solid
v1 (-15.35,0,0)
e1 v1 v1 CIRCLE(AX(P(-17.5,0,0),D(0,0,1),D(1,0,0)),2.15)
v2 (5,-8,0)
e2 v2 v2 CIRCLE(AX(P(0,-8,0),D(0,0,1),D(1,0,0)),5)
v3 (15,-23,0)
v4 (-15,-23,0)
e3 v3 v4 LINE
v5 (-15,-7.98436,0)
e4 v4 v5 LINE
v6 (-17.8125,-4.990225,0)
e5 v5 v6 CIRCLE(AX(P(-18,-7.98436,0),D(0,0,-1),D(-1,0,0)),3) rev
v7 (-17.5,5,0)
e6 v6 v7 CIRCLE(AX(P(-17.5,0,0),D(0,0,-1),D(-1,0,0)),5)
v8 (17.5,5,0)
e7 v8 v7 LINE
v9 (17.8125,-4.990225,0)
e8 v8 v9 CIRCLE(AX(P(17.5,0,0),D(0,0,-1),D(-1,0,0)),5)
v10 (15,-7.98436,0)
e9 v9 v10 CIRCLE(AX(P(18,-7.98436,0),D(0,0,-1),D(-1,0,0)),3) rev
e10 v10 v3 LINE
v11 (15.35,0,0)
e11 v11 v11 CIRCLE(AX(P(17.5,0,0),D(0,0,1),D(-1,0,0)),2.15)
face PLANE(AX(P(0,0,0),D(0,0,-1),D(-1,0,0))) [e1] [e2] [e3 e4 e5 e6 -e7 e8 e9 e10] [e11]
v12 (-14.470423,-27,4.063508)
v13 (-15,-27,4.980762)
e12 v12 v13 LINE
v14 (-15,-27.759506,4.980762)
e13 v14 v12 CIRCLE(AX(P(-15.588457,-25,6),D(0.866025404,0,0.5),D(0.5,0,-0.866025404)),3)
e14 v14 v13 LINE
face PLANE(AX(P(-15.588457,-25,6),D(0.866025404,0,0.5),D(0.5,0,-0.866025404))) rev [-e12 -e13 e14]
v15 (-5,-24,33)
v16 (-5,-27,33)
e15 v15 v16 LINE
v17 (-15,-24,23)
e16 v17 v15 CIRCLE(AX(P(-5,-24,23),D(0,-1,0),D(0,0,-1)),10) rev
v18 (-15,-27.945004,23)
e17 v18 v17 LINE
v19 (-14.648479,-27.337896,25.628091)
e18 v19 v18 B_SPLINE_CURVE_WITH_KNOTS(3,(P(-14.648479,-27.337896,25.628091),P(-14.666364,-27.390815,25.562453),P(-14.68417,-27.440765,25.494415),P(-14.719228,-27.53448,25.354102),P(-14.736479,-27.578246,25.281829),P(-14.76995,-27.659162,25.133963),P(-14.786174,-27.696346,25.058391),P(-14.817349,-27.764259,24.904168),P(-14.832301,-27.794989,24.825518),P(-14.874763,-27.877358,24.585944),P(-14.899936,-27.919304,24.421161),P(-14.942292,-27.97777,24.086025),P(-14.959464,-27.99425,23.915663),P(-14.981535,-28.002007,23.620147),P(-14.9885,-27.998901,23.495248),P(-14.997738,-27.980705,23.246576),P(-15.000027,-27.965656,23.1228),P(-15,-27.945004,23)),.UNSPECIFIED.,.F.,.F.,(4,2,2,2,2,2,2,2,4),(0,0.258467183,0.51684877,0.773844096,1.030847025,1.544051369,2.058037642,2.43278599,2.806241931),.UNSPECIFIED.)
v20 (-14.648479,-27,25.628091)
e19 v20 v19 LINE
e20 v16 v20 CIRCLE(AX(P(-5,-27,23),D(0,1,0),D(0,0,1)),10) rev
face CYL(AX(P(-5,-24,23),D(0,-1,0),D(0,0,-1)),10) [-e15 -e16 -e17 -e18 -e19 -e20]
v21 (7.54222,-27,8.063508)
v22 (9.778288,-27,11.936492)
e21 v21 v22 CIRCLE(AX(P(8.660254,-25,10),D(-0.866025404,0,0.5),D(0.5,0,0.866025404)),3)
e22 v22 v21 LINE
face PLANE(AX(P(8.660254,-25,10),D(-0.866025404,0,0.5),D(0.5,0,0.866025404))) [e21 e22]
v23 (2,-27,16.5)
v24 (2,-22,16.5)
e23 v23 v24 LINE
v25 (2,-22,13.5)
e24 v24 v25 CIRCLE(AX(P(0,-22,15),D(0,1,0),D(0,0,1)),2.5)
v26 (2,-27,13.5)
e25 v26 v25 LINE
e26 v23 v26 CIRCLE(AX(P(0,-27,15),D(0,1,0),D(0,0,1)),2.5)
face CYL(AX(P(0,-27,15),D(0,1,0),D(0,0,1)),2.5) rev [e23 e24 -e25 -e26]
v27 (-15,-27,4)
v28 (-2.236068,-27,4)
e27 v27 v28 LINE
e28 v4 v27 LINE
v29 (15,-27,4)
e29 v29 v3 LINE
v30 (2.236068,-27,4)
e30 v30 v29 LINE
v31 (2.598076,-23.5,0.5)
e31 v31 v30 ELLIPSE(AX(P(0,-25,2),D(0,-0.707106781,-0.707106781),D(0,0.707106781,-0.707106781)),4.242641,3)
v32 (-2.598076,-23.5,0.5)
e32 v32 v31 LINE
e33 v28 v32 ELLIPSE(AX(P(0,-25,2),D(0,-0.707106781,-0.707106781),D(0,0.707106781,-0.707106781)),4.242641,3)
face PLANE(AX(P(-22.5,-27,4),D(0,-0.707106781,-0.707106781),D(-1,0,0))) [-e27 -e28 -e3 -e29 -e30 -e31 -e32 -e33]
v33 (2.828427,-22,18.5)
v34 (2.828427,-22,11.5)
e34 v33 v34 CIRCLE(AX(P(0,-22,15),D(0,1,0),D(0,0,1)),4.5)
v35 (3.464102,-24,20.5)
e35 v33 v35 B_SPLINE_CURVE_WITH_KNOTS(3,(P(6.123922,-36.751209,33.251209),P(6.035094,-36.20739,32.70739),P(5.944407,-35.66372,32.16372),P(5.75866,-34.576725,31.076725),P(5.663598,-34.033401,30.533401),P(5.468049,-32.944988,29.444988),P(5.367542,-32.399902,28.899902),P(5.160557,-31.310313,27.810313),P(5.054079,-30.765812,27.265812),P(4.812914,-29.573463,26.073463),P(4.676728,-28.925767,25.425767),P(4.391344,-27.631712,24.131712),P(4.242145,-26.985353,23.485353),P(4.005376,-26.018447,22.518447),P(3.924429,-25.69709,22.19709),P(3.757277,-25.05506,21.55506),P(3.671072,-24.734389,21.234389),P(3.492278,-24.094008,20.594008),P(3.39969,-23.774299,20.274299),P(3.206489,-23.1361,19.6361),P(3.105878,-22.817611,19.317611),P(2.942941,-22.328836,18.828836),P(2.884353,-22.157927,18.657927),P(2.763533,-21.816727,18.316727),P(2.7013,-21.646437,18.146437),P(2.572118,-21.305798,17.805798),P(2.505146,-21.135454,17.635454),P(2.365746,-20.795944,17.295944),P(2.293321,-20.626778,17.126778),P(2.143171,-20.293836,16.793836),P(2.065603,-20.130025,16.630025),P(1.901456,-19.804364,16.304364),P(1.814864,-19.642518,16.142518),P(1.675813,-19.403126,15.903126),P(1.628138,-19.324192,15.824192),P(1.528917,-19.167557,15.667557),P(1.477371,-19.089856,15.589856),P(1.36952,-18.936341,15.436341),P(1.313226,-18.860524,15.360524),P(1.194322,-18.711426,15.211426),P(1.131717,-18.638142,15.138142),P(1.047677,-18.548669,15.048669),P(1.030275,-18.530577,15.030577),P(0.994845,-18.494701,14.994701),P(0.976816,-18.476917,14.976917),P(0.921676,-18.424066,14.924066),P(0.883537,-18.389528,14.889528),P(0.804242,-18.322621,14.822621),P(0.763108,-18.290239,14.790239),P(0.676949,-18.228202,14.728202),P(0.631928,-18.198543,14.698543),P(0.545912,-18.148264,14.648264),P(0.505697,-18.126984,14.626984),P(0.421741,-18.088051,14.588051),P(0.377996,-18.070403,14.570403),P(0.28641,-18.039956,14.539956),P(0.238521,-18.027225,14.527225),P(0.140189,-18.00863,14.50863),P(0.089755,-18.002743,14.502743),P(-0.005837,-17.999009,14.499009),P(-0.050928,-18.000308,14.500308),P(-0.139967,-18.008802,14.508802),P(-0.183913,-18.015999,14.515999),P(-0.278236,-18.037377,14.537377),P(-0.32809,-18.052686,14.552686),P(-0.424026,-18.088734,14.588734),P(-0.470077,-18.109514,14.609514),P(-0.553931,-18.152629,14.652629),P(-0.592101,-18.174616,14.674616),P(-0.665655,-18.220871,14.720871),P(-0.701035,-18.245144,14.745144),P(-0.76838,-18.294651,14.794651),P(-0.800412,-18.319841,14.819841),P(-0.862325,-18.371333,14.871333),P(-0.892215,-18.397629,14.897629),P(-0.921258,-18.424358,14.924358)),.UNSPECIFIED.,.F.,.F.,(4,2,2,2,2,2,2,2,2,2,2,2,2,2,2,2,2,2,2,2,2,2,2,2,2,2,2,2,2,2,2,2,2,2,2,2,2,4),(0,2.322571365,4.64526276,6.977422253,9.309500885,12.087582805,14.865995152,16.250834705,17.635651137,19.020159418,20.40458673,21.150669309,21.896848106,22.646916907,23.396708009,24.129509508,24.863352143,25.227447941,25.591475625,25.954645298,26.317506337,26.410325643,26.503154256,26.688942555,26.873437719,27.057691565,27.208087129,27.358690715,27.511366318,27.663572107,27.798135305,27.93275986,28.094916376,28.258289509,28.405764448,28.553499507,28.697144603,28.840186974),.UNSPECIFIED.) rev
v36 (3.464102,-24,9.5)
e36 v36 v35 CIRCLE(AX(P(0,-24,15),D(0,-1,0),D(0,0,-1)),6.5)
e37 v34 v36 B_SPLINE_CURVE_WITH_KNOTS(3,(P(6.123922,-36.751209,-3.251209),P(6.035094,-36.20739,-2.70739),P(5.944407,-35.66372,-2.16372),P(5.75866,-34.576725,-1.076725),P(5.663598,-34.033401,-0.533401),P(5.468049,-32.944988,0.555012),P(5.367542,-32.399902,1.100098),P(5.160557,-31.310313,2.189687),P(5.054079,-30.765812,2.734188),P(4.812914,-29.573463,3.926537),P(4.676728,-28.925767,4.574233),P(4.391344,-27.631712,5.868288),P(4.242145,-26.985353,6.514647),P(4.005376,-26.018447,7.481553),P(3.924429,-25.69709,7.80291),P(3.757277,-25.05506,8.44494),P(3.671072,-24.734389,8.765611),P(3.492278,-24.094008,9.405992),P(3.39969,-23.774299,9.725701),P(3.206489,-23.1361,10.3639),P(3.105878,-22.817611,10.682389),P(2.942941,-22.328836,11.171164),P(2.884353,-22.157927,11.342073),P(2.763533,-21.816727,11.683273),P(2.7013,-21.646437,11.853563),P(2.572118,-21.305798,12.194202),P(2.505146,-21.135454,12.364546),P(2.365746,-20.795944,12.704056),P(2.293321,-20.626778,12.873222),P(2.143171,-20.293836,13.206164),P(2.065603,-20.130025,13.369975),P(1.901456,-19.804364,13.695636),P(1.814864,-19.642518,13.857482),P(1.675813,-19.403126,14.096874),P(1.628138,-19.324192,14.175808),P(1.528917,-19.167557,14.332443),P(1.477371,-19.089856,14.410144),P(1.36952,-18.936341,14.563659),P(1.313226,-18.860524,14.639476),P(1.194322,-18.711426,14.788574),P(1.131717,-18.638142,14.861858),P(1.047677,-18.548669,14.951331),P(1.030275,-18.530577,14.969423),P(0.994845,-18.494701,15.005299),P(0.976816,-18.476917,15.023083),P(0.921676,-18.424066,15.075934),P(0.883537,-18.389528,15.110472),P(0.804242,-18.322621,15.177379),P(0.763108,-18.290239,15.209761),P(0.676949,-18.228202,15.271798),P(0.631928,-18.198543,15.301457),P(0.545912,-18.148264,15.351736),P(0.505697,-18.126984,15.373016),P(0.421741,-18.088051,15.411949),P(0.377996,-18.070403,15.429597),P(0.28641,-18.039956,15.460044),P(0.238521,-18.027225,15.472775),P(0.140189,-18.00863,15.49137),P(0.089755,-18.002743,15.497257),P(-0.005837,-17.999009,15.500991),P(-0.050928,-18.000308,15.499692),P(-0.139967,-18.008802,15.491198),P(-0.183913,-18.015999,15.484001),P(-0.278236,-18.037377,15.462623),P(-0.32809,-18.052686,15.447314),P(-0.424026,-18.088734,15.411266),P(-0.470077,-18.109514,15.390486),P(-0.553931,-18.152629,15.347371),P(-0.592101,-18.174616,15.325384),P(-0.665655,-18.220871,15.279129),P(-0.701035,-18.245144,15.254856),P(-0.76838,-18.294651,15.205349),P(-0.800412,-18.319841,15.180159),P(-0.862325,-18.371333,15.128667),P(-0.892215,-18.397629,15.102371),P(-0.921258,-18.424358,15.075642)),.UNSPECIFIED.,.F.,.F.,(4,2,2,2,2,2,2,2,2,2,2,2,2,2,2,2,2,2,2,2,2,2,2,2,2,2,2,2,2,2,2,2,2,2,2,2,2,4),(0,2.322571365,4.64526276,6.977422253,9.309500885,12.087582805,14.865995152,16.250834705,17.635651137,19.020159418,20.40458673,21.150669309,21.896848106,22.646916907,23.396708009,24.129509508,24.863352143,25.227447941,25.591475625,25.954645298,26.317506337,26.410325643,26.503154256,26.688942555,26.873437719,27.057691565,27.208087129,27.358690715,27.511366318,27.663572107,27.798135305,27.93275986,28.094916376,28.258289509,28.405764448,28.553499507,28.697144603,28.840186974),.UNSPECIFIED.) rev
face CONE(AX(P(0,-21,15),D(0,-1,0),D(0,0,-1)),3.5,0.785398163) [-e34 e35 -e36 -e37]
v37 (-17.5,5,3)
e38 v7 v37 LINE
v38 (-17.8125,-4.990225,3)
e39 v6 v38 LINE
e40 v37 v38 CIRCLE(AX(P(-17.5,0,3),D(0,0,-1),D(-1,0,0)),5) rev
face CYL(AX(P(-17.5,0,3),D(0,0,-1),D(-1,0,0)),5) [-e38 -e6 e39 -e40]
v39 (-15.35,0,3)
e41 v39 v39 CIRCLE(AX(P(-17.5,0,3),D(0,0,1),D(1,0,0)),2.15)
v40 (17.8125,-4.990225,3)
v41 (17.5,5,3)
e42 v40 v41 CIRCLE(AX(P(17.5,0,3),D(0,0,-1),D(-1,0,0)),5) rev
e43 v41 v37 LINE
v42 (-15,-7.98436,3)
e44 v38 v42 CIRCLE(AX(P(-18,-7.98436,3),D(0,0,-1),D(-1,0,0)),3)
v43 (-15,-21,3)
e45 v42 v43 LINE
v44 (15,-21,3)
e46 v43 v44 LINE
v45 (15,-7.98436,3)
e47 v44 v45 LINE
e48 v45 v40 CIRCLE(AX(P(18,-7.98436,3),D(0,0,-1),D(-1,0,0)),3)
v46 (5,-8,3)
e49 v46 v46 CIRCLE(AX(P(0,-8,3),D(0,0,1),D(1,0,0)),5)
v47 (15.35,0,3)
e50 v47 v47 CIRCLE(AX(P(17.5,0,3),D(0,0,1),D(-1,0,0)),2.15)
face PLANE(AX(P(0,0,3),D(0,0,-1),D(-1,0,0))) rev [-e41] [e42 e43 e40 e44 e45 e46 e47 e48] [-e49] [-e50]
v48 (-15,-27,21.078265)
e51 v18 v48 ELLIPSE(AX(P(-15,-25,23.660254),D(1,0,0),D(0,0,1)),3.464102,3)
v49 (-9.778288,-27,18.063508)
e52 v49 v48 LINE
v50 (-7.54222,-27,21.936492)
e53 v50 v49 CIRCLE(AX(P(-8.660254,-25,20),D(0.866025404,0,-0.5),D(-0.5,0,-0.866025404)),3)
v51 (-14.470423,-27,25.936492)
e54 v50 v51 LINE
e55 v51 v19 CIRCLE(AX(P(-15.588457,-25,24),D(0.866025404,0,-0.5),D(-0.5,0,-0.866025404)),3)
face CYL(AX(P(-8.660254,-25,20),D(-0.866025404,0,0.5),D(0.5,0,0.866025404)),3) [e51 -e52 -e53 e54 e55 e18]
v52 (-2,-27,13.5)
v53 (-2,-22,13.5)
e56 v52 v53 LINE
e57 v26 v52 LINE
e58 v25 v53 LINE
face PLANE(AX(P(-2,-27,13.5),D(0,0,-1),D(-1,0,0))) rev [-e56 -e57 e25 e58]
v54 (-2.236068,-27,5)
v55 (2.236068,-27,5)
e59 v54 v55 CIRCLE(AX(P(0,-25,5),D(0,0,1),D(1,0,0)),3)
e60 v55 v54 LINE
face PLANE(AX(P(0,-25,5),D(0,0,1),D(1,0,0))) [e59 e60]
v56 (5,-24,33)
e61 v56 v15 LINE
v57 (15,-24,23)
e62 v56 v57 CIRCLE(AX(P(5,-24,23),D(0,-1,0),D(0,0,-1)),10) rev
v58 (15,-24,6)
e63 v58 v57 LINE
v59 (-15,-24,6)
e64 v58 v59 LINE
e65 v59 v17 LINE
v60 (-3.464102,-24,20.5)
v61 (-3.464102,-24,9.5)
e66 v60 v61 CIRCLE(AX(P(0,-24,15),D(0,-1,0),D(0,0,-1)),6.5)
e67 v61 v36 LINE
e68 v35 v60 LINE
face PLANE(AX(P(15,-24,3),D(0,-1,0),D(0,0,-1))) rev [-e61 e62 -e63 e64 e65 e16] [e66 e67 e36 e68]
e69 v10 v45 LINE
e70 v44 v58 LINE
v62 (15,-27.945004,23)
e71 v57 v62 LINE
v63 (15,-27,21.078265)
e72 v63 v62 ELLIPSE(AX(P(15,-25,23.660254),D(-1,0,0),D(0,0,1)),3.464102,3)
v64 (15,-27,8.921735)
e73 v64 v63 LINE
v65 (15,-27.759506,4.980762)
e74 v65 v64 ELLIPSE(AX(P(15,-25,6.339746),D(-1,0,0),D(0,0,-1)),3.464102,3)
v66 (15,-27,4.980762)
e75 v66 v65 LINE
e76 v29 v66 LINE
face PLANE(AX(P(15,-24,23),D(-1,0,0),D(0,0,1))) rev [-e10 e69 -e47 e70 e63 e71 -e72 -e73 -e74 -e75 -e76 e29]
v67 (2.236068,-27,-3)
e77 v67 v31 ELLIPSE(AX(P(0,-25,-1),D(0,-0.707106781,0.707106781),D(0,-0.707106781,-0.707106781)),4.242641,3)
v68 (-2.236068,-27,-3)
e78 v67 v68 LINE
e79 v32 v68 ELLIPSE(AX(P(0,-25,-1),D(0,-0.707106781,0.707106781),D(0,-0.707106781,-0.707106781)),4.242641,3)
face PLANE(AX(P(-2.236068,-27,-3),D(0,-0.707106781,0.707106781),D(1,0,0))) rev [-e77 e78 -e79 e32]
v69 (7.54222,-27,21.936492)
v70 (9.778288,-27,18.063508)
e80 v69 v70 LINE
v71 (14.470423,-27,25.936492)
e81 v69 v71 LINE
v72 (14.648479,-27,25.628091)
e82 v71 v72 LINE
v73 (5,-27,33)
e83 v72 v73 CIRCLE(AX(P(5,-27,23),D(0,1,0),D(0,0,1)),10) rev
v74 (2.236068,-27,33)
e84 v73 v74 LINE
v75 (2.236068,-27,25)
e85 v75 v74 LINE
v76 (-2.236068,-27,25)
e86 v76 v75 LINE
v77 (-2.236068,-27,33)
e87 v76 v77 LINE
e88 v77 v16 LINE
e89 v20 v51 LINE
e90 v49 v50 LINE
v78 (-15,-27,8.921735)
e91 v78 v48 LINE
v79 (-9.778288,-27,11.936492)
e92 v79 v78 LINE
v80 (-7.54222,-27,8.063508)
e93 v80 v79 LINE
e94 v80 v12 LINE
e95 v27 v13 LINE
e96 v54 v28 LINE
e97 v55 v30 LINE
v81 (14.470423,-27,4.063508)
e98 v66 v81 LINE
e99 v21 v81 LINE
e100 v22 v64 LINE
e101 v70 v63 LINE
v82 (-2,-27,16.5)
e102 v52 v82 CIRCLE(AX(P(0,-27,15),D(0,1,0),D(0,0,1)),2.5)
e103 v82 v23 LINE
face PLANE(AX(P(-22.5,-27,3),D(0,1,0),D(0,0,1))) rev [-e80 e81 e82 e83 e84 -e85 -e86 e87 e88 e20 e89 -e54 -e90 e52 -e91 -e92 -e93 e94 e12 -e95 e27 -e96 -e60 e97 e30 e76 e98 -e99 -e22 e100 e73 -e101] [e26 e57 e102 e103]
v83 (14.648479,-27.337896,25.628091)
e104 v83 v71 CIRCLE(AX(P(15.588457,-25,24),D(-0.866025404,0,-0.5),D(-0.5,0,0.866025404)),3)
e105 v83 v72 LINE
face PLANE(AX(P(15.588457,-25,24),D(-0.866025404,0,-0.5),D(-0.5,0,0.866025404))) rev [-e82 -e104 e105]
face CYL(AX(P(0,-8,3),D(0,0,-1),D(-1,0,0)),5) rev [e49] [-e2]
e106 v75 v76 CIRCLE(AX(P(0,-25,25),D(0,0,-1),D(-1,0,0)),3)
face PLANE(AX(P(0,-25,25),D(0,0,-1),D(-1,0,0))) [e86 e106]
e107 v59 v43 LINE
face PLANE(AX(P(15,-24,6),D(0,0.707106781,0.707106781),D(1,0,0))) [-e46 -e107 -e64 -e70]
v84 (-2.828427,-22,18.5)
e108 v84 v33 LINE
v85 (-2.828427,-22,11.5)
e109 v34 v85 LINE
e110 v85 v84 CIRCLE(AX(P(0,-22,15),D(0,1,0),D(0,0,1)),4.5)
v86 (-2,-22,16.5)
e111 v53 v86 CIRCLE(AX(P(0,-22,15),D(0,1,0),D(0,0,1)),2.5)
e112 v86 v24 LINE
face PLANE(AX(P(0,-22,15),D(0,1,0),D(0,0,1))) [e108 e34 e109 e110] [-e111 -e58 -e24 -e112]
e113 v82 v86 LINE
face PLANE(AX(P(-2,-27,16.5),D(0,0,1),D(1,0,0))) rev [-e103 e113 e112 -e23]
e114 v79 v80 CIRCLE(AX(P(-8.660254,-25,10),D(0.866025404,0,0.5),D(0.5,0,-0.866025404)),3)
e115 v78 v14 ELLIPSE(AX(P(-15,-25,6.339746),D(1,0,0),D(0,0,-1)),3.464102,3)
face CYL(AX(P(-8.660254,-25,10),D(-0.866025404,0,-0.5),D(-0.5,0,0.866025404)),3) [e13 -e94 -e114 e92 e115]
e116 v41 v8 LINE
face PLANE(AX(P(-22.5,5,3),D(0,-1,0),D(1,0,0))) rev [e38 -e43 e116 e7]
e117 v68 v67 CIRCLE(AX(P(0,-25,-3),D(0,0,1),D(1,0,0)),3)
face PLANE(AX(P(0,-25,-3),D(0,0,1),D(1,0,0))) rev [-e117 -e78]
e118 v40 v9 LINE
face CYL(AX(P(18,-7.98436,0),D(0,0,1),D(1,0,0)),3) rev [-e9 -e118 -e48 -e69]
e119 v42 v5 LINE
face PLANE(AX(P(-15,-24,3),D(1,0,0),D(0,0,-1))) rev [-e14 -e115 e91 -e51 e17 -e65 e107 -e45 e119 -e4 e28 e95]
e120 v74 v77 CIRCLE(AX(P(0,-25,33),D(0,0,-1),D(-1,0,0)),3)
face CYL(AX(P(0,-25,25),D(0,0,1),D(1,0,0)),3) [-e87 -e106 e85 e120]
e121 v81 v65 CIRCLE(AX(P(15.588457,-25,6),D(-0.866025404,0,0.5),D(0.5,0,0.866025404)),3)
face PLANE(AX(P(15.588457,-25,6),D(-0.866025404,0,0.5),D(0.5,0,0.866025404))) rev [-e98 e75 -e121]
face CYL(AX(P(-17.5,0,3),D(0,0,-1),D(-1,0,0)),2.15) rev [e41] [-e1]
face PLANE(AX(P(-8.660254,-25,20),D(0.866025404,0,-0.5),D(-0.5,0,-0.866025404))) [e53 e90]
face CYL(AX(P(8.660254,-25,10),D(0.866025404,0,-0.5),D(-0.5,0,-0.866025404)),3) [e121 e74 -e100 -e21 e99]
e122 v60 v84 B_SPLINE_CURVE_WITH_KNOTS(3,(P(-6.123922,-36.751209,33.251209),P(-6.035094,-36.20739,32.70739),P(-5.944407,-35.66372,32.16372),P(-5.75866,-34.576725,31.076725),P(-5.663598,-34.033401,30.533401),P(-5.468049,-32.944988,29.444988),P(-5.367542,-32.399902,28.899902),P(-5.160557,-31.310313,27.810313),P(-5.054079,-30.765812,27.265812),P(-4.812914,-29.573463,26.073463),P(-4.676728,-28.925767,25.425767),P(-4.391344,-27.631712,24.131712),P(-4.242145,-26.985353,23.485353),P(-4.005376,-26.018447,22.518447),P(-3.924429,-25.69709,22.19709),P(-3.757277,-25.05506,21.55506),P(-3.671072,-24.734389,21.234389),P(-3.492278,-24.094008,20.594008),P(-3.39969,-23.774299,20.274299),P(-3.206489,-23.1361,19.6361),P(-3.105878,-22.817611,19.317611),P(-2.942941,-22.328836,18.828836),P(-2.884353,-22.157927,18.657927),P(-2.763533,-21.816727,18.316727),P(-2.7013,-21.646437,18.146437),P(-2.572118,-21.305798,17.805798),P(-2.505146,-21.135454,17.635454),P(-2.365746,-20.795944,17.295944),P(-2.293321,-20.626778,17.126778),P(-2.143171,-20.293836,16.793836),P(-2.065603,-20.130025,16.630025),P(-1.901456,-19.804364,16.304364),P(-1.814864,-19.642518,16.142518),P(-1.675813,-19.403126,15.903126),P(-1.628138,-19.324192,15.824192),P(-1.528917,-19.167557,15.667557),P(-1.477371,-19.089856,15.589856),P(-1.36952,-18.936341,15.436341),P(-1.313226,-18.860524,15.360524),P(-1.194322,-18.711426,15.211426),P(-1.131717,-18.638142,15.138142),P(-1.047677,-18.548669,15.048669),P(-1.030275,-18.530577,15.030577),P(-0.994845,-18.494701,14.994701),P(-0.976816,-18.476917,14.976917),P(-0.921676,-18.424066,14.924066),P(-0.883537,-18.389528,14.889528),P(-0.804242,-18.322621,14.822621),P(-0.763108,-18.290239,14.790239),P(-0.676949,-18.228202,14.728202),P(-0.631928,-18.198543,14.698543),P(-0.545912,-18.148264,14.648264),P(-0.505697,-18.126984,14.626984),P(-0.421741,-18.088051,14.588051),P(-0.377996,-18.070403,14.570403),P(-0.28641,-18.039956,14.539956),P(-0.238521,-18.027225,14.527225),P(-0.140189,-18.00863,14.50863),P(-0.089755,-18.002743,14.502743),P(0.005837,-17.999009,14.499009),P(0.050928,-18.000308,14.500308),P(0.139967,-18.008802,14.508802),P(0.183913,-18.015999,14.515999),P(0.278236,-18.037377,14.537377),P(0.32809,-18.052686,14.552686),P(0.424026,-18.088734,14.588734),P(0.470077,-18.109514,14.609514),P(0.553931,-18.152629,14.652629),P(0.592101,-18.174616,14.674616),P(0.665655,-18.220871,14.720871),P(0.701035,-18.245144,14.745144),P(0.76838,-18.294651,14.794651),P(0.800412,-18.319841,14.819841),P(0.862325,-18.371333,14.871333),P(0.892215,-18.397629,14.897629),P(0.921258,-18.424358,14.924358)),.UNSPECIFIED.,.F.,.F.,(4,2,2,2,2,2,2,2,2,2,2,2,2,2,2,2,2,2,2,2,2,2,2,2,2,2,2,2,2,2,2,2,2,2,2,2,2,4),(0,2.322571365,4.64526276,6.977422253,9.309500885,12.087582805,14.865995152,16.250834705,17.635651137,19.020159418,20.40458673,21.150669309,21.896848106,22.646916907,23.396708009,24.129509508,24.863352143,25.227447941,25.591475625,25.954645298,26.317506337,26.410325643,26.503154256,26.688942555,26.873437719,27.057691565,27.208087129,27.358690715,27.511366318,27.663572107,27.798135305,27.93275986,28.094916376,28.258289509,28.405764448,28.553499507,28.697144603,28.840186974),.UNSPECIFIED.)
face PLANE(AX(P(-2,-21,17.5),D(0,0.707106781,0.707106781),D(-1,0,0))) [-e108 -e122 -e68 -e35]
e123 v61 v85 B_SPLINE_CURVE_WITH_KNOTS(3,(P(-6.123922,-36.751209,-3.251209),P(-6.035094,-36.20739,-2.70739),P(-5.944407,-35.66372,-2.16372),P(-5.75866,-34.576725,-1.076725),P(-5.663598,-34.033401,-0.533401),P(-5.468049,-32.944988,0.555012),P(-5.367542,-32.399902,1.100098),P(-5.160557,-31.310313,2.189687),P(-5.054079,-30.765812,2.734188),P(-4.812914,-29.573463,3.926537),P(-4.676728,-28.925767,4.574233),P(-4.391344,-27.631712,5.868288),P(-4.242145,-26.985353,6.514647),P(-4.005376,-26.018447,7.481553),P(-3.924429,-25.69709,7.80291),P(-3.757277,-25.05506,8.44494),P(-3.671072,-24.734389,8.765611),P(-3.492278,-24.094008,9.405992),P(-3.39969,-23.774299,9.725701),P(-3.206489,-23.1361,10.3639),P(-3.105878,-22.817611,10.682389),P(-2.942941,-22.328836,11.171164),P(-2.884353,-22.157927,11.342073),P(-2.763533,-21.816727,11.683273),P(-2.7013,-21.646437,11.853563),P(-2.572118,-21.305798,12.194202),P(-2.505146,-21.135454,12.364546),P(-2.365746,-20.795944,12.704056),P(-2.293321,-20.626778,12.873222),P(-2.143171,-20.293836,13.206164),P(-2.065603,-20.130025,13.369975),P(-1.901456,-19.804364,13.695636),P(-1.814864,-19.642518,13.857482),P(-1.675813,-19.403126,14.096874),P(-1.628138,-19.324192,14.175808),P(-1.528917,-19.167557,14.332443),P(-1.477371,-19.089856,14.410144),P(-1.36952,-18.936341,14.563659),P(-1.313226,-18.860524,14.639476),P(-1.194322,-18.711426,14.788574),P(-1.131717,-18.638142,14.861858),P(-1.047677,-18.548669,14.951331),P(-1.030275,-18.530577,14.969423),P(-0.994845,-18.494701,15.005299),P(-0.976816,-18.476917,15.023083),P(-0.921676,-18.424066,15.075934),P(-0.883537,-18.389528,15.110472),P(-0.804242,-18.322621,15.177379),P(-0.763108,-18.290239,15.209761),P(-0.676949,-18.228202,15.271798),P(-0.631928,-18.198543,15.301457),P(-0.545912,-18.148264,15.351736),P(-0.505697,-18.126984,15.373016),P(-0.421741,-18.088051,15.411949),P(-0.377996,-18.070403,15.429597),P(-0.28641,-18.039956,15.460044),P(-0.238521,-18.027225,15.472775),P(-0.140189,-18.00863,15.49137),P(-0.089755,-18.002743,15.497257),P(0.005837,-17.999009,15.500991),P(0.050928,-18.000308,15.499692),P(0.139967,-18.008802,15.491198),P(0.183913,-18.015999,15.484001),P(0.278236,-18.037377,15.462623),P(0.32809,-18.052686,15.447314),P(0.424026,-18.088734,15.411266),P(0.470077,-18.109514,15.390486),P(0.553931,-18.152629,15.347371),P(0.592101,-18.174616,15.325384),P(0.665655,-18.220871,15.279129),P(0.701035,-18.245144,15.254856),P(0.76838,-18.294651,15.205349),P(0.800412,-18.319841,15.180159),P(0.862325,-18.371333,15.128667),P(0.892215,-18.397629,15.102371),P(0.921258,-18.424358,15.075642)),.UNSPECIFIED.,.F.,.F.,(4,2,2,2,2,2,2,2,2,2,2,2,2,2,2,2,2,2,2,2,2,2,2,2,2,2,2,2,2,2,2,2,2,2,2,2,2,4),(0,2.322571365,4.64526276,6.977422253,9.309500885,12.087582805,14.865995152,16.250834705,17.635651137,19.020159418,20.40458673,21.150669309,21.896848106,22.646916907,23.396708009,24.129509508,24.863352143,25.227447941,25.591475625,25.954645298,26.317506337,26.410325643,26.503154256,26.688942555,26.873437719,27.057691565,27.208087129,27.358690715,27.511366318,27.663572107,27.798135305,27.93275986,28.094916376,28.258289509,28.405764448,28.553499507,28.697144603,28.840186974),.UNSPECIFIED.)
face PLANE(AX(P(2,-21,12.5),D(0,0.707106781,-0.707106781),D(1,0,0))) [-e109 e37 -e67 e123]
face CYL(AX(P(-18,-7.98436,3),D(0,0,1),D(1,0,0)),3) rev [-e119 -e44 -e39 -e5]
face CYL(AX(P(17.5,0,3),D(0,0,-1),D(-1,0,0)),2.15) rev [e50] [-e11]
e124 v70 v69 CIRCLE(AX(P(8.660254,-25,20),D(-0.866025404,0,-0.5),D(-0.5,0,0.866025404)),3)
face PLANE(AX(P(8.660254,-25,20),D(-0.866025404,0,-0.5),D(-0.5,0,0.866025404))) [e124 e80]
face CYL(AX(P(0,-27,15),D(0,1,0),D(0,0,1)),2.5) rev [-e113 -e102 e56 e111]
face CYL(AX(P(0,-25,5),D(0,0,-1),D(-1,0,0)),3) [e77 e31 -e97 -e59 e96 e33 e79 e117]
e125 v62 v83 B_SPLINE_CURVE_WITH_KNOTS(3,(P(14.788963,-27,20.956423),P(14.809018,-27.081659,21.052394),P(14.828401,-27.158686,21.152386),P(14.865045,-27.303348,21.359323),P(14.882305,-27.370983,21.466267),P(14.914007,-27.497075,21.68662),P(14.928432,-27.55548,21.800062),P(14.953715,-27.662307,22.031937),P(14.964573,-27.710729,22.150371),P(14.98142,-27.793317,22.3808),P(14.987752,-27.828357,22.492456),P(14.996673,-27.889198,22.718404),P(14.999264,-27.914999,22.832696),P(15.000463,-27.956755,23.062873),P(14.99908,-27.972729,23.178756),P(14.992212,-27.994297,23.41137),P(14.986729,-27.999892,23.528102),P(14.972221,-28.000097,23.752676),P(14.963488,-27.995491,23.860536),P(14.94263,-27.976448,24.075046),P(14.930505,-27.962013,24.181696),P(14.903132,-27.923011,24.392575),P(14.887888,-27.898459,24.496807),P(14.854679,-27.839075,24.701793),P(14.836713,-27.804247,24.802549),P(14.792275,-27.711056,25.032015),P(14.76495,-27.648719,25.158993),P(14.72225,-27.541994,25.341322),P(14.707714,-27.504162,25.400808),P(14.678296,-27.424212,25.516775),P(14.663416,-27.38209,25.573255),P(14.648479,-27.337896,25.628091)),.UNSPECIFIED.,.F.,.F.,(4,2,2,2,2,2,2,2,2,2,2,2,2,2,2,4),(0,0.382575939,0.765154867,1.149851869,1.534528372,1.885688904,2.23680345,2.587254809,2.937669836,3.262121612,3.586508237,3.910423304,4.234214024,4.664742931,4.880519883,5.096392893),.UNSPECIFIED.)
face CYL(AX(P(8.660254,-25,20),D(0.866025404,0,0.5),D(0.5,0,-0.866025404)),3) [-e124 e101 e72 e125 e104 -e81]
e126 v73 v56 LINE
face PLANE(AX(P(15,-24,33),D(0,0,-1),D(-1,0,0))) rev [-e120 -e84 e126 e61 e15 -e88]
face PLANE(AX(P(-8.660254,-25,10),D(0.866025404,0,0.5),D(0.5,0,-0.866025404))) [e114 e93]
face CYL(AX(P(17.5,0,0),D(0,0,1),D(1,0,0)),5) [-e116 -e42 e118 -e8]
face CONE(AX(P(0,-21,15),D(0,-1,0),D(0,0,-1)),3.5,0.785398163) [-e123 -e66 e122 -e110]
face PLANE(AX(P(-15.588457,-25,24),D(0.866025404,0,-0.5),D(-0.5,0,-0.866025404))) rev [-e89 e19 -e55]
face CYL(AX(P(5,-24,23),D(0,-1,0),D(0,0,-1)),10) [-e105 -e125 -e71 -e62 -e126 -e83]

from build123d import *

# Parameters (mm, degrees)
SKETCH1_W               = 45
SKETCH1_H               = 32
SKETCH1_R               = 2.15
SKETCH1_R_2             = 5
BOSS_EXTRUDE1_DEPTH     = 3
SKETCH3_W               = 30
SKETCH3_H               = 3
EXTRUDE_THIN1_DEPTH     = 15
CUT_EXTRUDE1_DEPTH      = 50.35838328
CUT_EXTRUDE2_DEPTH      = 47.208765402
CUT_EXTRUDE2_DEPTH_BACK = 47.208765402
SKETCH5_W               = 7.5
SKETCH5_H               = 22
EXTRUDE_THIN2_START     = 2
EXTRUDE_THIN2_DEPTH     = 2
CHAMFER1_SIZE           = 3
BOSS_EXTRUDE3_DEPTH     = 8
CIRPATTERN1_COUNT       = 6
CHAMFER4_SIZE           = 3
FILLET1_R               = 10
CHAMFER2_SIZE           = 4
CHAMFER3_SIZE           = 3
FILLET2_R               = 5
FILLET3_R               = 3
INTERSECT1_START        = -28.000000924
INTERSECT1_DEPTH        = 1.000000924


# Read off the part's stored shape, not the designer's step: Intersect1
# Some blends are built 0.0001 mm under size
with BuildPart() as part:
    # Sketch1 → Boss-Extrude1 (new body)
    with BuildSketch(Plane.XY):
        with Locations((0, -11)):
            Rectangle(SKETCH1_W, SKETCH1_H)
        with Locations((-17.5, 0)):
            Circle(SKETCH1_R, mode=Mode.SUBTRACT)
        with Locations(Location((17.5, 0, 0), (0, 0, 180))):
            Circle(SKETCH1_R, mode=Mode.SUBTRACT)
        with Locations((0, -8)):
            Circle(SKETCH1_R_2, mode=Mode.SUBTRACT)
    extrude(amount=BOSS_EXTRUDE1_DEPTH)

    # Sketch3 → Extrude-Thin1 (add, symmetric)
    with BuildSketch(Plane.ZY):
        with Locations((18, -25.5)):
            Rectangle(SKETCH3_W, SKETCH3_H)
    extrude(amount=EXTRUDE_THIN1_DEPTH, both=True)

    # Sketch4 → Cut-Extrude1 (cut, through all)
    with BuildSketch(Plane(origin=(0, -24, 0), x_dir=(1, 0, 0), z_dir=(0, 1, 0))):
        with BuildLine():
            Line((-2, -13.5), (2, -13.5))
            ThreePointArc((2, -13.5), (2.5, -15), (2, -16.5))
            Line((2, -16.5), (-2, -16.5))
            ThreePointArc((-2, -16.5), (-2.5, -15), (-2, -13.5))
        make_face()
    extrude(amount=-CUT_EXTRUDE1_DEPTH, mode=Mode.SUBTRACT)

    # Sketch5 → Cut-Extrude2 (cut, two sides: drawn at the far end of the back side and taken through both)
    with BuildSketch(Plane.XY.offset(3).offset(-CUT_EXTRUDE2_DEPTH_BACK)):
        with Locations((-18.75, -16)):
            Rectangle(SKETCH5_W, SKETCH5_H)
        with Locations((18.75, -16)):
            Rectangle(SKETCH5_W, SKETCH5_H)
    extrude(amount=CUT_EXTRUDE2_DEPTH + CUT_EXTRUDE2_DEPTH_BACK, mode=Mode.SUBTRACT)

    # Sketch6 → Extrude-Thin2 (add)
    with BuildSketch(Plane(origin=(0, -24, 0), x_dir=(1, 0, 0), z_dir=(0, 1, 0)).offset(EXTRUDE_THIN2_START)):
        with BuildLine():
            Line((-2.449489743, -17.5), (2.449489743, -17.5))
            ThreePointArc((2.449489743, -17.5), (3.5, -15), (2.449489743, -12.5))
            Line((2.449489743, -12.5), (-2.449489743, -12.5))
            ThreePointArc((-2.449489743, -12.5), (-3.5, -15), (-2.449489743, -17.5))
        make_face()
        with BuildLine():
            Line((-2, -16.5), (2, -16.5))
            ThreePointArc((2, -16.5), (2.5, -15), (2, -13.5))
            Line((2, -13.5), (-2, -13.5))
            ThreePointArc((-2, -13.5), (-2.5, -15), (-2, -16.5))
        make_face(mode=Mode.SUBTRACT)
    extrude(amount=-EXTRUDE_THIN2_DEPTH)

    # Chamfer1
    # the kernel refuses this chamfer: 3 mm, written as the material it adds along each edge
    with BuildSketch(Plane(origin=(10.164538707, -24, 12.5), x_dir=(0, -0.02749587661058678, -0.9996219169112968), z_dir=(-1, 0, 0))) as chamfer1_piece_1_section:
        Polygon((CHAMFER1_SIZE * 0.999621916911, -CHAMFER1_SIZE * 0.0274958766106), (-CHAMFER1_SIZE * 0.0274958766106, -CHAMFER1_SIZE * 0.999621916911), (0, 0), align=None)
    chamfer1_piece_1 = extrude(amount=20.329077413, mode=Mode.PRIVATE)
    chamfer1_piece_1 = split(chamfer1_piece_1, bisect_by=Plane(origin=(7e-09, -22, 12.12784901), z_dir=(0, -1, 0)), keep=Keep.TOP, mode=Mode.PRIVATE)
    chamfer1_piece_1 = chamfer1_piece_1 & Plane(origin=(0, -23.022077553, 15), x_dir=(0.699854212223763, 0, 0.7142857142857164), z_dir=(0, 1, 0)) * Cylinder(3.5, 53, mode=Mode.PRIVATE)
    add(chamfer1_piece_1)
    with BuildSketch(Plane(origin=(0, -24, 15), x_dir=(0.9901066627399402, 0, -0.140316771620424), z_dir=(0.140316771620424, 0, 0.9901066627399402))) as chamfer1_piece_2_section:
        Polygon((3.5 + CHAMFER1_SIZE, 0), (3.5, CHAMFER1_SIZE), (3.5, 0), align=None)
    chamfer1_piece_2 = revolve(axis=Axis((0, -24, 15), (0, 1, 0)), revolution_arc=343.867646272, mode=Mode.PRIVATE)
    chamfer1_piece_2 = split(chamfer1_piece_2, bisect_by=Plane(origin=(4.19137438, -22, 13.401943095), z_dir=(0, -1, 0)), keep=Keep.TOP, mode=Mode.PRIVATE)
    chamfer1_piece_2 = split(chamfer1_piece_2, bisect_by=Plane(origin=(4.19137438, -23.188236886, 17.5), z_dir=(0, 0, -1)), keep=Keep.TOP, mode=Mode.PRIVATE)
    chamfer1_piece_2 = split(chamfer1_piece_2, bisect_by=Plane(origin=(4.19137438, -23.188236886, 12.5), z_dir=(0, 0, 1)), keep=Keep.TOP, mode=Mode.PRIVATE)
    add(chamfer1_piece_2)
    with BuildSketch(Plane(origin=(0, -24, 15), x_dir=(-0.9901066627399404, 0, 0.14031677162042244), z_dir=(-0.14031677162042244, 0, -0.9901066627399404))) as chamfer1_piece_3_section:
        Polygon((3.5, CHAMFER1_SIZE), (3.5 + CHAMFER1_SIZE, 0), (3.5, 0), align=None)
    chamfer1_piece_3 = revolve(axis=Axis((0, -24, 15), (0, 1, 0)), revolution_arc=343.867646272, mode=Mode.PRIVATE)
    chamfer1_piece_3 = split(chamfer1_piece_3, bisect_by=Plane(origin=(-4.191374251, -22, 16.598056899), z_dir=(0, -1, 0)), keep=Keep.TOP, mode=Mode.PRIVATE)
    chamfer1_piece_3 = split(chamfer1_piece_3, bisect_by=Plane(origin=(-4.191374251, -23.188236825, 17.5), z_dir=(0, 0, -1)), keep=Keep.TOP, mode=Mode.PRIVATE)
    chamfer1_piece_3 = split(chamfer1_piece_3, bisect_by=Plane(origin=(-4.191374251, -23.188236825, 12.5), z_dir=(0, 0, 1)), keep=Keep.TOP, mode=Mode.PRIVATE)
    add(chamfer1_piece_3)
    with BuildSketch(Plane(origin=(-10.164538707, -24, 17.5), x_dir=(0, -0.027495876610586768, 0.9996219169112968), z_dir=(1, 0, 0))) as chamfer1_piece_4_section:
        Polygon((CHAMFER1_SIZE * 0.999621916911, -CHAMFER1_SIZE * 0.0274958766106), (-CHAMFER1_SIZE * 0.0274958766106, -CHAMFER1_SIZE * 0.999621916911), (0, 0), align=None)
    chamfer1_piece_4 = extrude(amount=20.329077413, mode=Mode.PRIVATE)
    chamfer1_piece_4 = split(chamfer1_piece_4, bisect_by=Plane(origin=(-7e-09, -22, 17.87215099), z_dir=(0, -1, 0)), keep=Keep.TOP, mode=Mode.PRIVATE)
    chamfer1_piece_4 = chamfer1_piece_4 & Plane(origin=(0, -23.022077553, 15), x_dir=(0.699854212223763, 0, 0.7142857142857164), z_dir=(0, 1, 0)) * Cylinder(3.5, 53, mode=Mode.PRIVATE)
    add(chamfer1_piece_4)
    with BuildSketch(Plane(origin=(0, -24, 15), x_dir=(-0.9901066627399404, 0, 0.14031677162042244), z_dir=(-0.14031677162042244, 0, -0.9901066627399404))) as chamfer1_piece_5a_section:
        Polygon((3.5, CHAMFER1_SIZE), (3.5 + CHAMFER1_SIZE, 0), (3.5, 0), align=None)
    chamfer1_piece_5a = revolve(axis=Axis((0, -24, 15), (0, 1, 0)), revolution_arc=343.867646272, mode=Mode.PRIVATE)
    chamfer1_piece_5a = split(chamfer1_piece_5a, bisect_by=Plane(origin=(0, -22, 10.999585628), z_dir=(0, -1, 0)), keep=Keep.TOP, mode=Mode.PRIVATE)
    chamfer1_piece_5a = split(chamfer1_piece_5a, bisect_by=Plane(origin=(0, -23.271769179, 12.5), z_dir=(0, 0, -1)), keep=Keep.TOP, mode=Mode.PRIVATE)
    with BuildSketch(Plane(origin=(10.164538707, -24, 12.5), x_dir=(0, -0.02749587661058678, -0.9996219169112968), z_dir=(-1, 0, 0))) as chamfer1_piece_5b_section:
        Polygon((CHAMFER1_SIZE * 0.999621916911, -CHAMFER1_SIZE * 0.0274958766106), (-CHAMFER1_SIZE * 0.0274958766106, -CHAMFER1_SIZE * 0.999621916911), (0, 0), align=None)
    chamfer1_piece_5b = extrude(amount=20.329077413, mode=Mode.PRIVATE)
    chamfer1_piece_5b = split(chamfer1_piece_5b, bisect_by=Plane(origin=(0, -22, 11.341108232), z_dir=(0, -1, 0)), keep=Keep.TOP, mode=Mode.PRIVATE)
    chamfer1_piece_5b = chamfer1_piece_5b - Plane(origin=(0, -23.224020782, 15), x_dir=(0.699854212223763, 0, 0.7142857142857164), z_dir=(0, 1, 0)) * Cylinder(3.5, 53, mode=Mode.PRIVATE)
    chamfer1_piece_5 = chamfer1_piece_5a & chamfer1_piece_5b
    add(chamfer1_piece_5)
    with BuildSketch(Plane(origin=(10.164538707, -24, 12.5), x_dir=(0, -0.02749587661058678, -0.9996219169112968), z_dir=(-1, 0, 0))) as chamfer1_piece_6a_section:
        Polygon((CHAMFER1_SIZE * 0.999621916911, -CHAMFER1_SIZE * 0.0274958766106), (-CHAMFER1_SIZE * 0.0274958766106, -CHAMFER1_SIZE * 0.999621916911), (0, 0), align=None)
    chamfer1_piece_6a = extrude(amount=20.329077413, mode=Mode.PRIVATE)
    chamfer1_piece_6a = split(chamfer1_piece_6a, bisect_by=Plane(origin=(0, -22, 11.341108232), z_dir=(0, -1, 0)), keep=Keep.TOP, mode=Mode.PRIVATE)
    chamfer1_piece_6a = chamfer1_piece_6a - Plane(origin=(0, -23.224020782, 15), x_dir=(0.699854212223763, 0, 0.7142857142857164), z_dir=(0, 1, 0)) * Cylinder(3.5, 53, mode=Mode.PRIVATE)
    with BuildSketch(Plane(origin=(0, -24, 15), x_dir=(0.9901066627399402, 0, -0.140316771620424), z_dir=(0.140316771620424, 0, 0.9901066627399402))) as chamfer1_piece_6b_section:
        Polygon((3.5 + CHAMFER1_SIZE, 0), (3.5, CHAMFER1_SIZE), (3.5, 0), align=None)
    chamfer1_piece_6b = revolve(axis=Axis((0, -24, 15), (0, 1, 0)), revolution_arc=343.867646272, mode=Mode.PRIVATE)
    chamfer1_piece_6b = split(chamfer1_piece_6b, bisect_by=Plane(origin=(0, -22, 10.999585483), z_dir=(0, -1, 0)), keep=Keep.TOP, mode=Mode.PRIVATE)
    chamfer1_piece_6b = split(chamfer1_piece_6b, bisect_by=Plane(origin=(0, -23.271769428, 12.5), z_dir=(0, 0, -1)), keep=Keep.TOP, mode=Mode.PRIVATE)
    chamfer1_piece_6 = chamfer1_piece_6a & chamfer1_piece_6b
    add(chamfer1_piece_6)
    with BuildSketch(Plane(origin=(0, -24, 15), x_dir=(0.9901066627399402, 0, -0.140316771620424), z_dir=(0.140316771620424, 0, 0.9901066627399402))) as chamfer1_piece_7a_section:
        Polygon((3.5 + CHAMFER1_SIZE, 0), (3.5, CHAMFER1_SIZE), (3.5, 0), align=None)
    chamfer1_piece_7a = revolve(axis=Axis((0, -24, 15), (0, 1, 0)), revolution_arc=343.867646272, mode=Mode.PRIVATE)
    chamfer1_piece_7a = split(chamfer1_piece_7a, bisect_by=Plane(origin=(2e-09, -22, 19.000414518), z_dir=(0, -1, 0)), keep=Keep.TOP, mode=Mode.PRIVATE)
    chamfer1_piece_7a = split(chamfer1_piece_7a, bisect_by=Plane(origin=(2e-09, -23.271769429, 17.5), z_dir=(0, 0, 1)), keep=Keep.TOP, mode=Mode.PRIVATE)
    with BuildSketch(Plane(origin=(-10.164538707, -24, 17.5), x_dir=(0, -0.027495876610586768, 0.9996219169112968), z_dir=(1, 0, 0))) as chamfer1_piece_7b_section:
        Polygon((CHAMFER1_SIZE * 0.999621916911, -CHAMFER1_SIZE * 0.0274958766106), (-CHAMFER1_SIZE * 0.0274958766106, -CHAMFER1_SIZE * 0.999621916911), (0, 0), align=None)
    chamfer1_piece_7b = extrude(amount=20.329077413, mode=Mode.PRIVATE)
    chamfer1_piece_7b = split(chamfer1_piece_7b, bisect_by=Plane(origin=(1e-09, -22, 18.658891768), z_dir=(0, -1, 0)), keep=Keep.TOP, mode=Mode.PRIVATE)
    chamfer1_piece_7b = chamfer1_piece_7b - Plane(origin=(0, -23.224020782, 15), x_dir=(0.699854212223763, 0, 0.7142857142857164), z_dir=(0, 1, 0)) * Cylinder(3.5, 53, mode=Mode.PRIVATE)
    chamfer1_piece_7 = chamfer1_piece_7a & chamfer1_piece_7b
    add(chamfer1_piece_7)
    with BuildSketch(Plane(origin=(0, -24, 15), x_dir=(-0.9901066627399404, 0, 0.14031677162042244), z_dir=(-0.14031677162042244, 0, -0.9901066627399404))) as chamfer1_piece_8a_section:
        Polygon((3.5, CHAMFER1_SIZE), (3.5 + CHAMFER1_SIZE, 0), (3.5, 0), align=None)
    chamfer1_piece_8a = revolve(axis=Axis((0, -24, 15), (0, 1, 0)), revolution_arc=343.867646272, mode=Mode.PRIVATE)
    chamfer1_piece_8a = split(chamfer1_piece_8a, bisect_by=Plane(origin=(0, -22, 19.000414372), z_dir=(0, -1, 0)), keep=Keep.TOP, mode=Mode.PRIVATE)
    chamfer1_piece_8a = split(chamfer1_piece_8a, bisect_by=Plane(origin=(0, -23.27176918, 17.5), z_dir=(0, 0, 1)), keep=Keep.TOP, mode=Mode.PRIVATE)
    with BuildSketch(Plane(origin=(-10.164538707, -24, 17.5), x_dir=(0, -0.027495876610586768, 0.9996219169112968), z_dir=(1, 0, 0))) as chamfer1_piece_8b_section:
        Polygon((CHAMFER1_SIZE * 0.999621916911, -CHAMFER1_SIZE * 0.0274958766106), (-CHAMFER1_SIZE * 0.0274958766106, -CHAMFER1_SIZE * 0.999621916911), (0, 0), align=None)
    chamfer1_piece_8b = extrude(amount=20.329077413, mode=Mode.PRIVATE)
    chamfer1_piece_8b = split(chamfer1_piece_8b, bisect_by=Plane(origin=(1e-09, -22, 18.658891768), z_dir=(0, -1, 0)), keep=Keep.TOP, mode=Mode.PRIVATE)
    chamfer1_piece_8b = chamfer1_piece_8b - Plane(origin=(0, -23.224020782, 15), x_dir=(0.699854212223763, 0, 0.7142857142857164), z_dir=(0, 1, 0)) * Cylinder(3.5, 53, mode=Mode.PRIVATE)
    chamfer1_piece_8 = chamfer1_piece_8a & chamfer1_piece_8b
    add(chamfer1_piece_8)

    # Sketch8 → Boss-Extrude3 (add)
    with BuildSketch(Plane(origin=(0, 0, 33), x_dir=(-1, 0, 0), z_dir=(0, 0, -1))):
        with BuildLine():
            Line((-2.236067977, -27), (2.236067977, -27))
            ThreePointArc((2.236067977, -27), (0, -28), (-2.236067977, -27))
        make_face()
    boss_extrude3 = extrude(amount=BOSS_EXTRUDE3_DEPTH)

    # CirPattern1: Boss-Extrude3 ×6 about axis
    cirpattern1_axis = Axis((0, 0, 15), (0, 1, 0))
    for i in range(1, CIRPATTERN1_COUNT):
        add(boss_extrude3.rotate(cirpattern1_axis, i * 360 / CIRPATTERN1_COUNT))

    # Chamfer4
    chamfer4_edges = [part.edges().sort_by_distance(p)[0] for p in [
        (0, -27, 0),
    ]]
    chamfer(chamfer4_edges, length=CHAMFER4_SIZE - 0.0001)  # a hair under: the kernel refuses the full size

    # Fillet1
    # the kernel refuses this fillet: 10 mm, written as the material it takes off along each edge
    with BuildSketch(Plane(origin=(-15, -27, 33), x_dir=(0, 0, -1), z_dir=(0, 1, 0))) as fillet1_piece_1:
        with BuildLine():
            CenterArc((FILLET1_R, -FILLET1_R), FILLET1_R, 90, 90)
            Line((0, -FILLET1_R), (0, 0))
            Line((0, 0), (FILLET1_R, 0))
        make_face()
    extrude(amount=28, mode=Mode.SUBTRACT)
    with BuildSketch(Plane(origin=(15, -27, 33), x_dir=(0, 0, -1), z_dir=(0, 1, 0))) as fillet1_piece_2:
        with BuildLine():
            CenterArc((FILLET1_R, FILLET1_R), FILLET1_R, 180, 90)
            Line((0, FILLET1_R), (0, 0))
            Line((0, 0), (FILLET1_R, 0))
        make_face()
    extrude(amount=28, mode=Mode.SUBTRACT)

    # Chamfer2
    # the kernel refuses this chamfer: 4 mm, written as the material it takes off along each edge
    with BuildSketch(Plane(origin=(-25.286731952, -27, 0), x_dir=(0, 0.9996219169112968, -0.027495876610586365), z_dir=(1, 0, 0))) as chamfer2_piece_1_section:
        Polygon((CHAMFER2_SIZE * 0.999621916911, CHAMFER2_SIZE * 0.0274958766106), (-CHAMFER2_SIZE * 0.0274958766106, CHAMFER2_SIZE * 0.999621916911), (0, 0), align=None)
    chamfer2_piece_1 = extrude(amount=33.337395926, mode=Mode.PRIVATE)
    chamfer2_piece_1 = chamfer2_piece_1 - Plane(origin=(0, -25, 0.166625049), x_dir=(0.7453559924999285, -0.6666666666666683, 0), z_dir=(0, 0, -1)) * Cylinder(3, 83, mode=Mode.PRIVATE)
    add(chamfer2_piece_1, mode=Mode.SUBTRACT)
    with BuildSketch(Plane(origin=(-25.286731952, -27, 0), x_dir=(0, 0.9996219169112968, -0.027495876610586365), z_dir=(1, 0, 0))) as chamfer2_piece_2_section:
        Polygon((CHAMFER2_SIZE * 0.999621916911, CHAMFER2_SIZE * 0.0274958766106), (-CHAMFER2_SIZE * 0.0274958766106, CHAMFER2_SIZE * 0.999621916911), (0, 0), align=None)
    chamfer2_piece_2 = extrude(amount=33.337395926, mode=Mode.PRIVATE)
    chamfer2_piece_2 = split(chamfer2_piece_2, bisect_by=Plane(origin=(8e-08, -23.671290362, 0.328809638), z_dir=(0, 0.7071067811865475, -0.7071067811865476)), keep=Keep.TOP, mode=Mode.PRIVATE)
    add(chamfer2_piece_2, mode=Mode.SUBTRACT)
    with BuildSketch(Plane(origin=(-8.050663974, -27, 0), x_dir=(0, 0.9996219169112968, -0.027495876610586365), z_dir=(1, 0, 0))) as chamfer2_piece_3_section:
        Polygon((CHAMFER2_SIZE * 0.999621916911, CHAMFER2_SIZE * 0.0274958766106), (-CHAMFER2_SIZE * 0.0274958766106, CHAMFER2_SIZE * 0.999621916911), (0, 0), align=None)
    chamfer2_piece_3 = extrude(amount=33.337395926, mode=Mode.PRIVATE)
    chamfer2_piece_3 = chamfer2_piece_3 - Plane(origin=(0, -25, 0.16655092), x_dir=(0.7453559924999285, -0.6666666666666683, 0), z_dir=(0, 0, -1)) * Cylinder(3, 83, mode=Mode.PRIVATE)
    add(chamfer2_piece_3, mode=Mode.SUBTRACT)
    with BuildSketch(Plane(origin=(-8.050663974, -27, 0), x_dir=(0, 0.9996219169112968, -0.027495876610586365), z_dir=(1, 0, 0))) as chamfer2_piece_4_section:
        Polygon((CHAMFER2_SIZE * 0.999621916911, CHAMFER2_SIZE * 0.0274958766106), (-CHAMFER2_SIZE * 0.0274958766106, CHAMFER2_SIZE * 0.999621916911), (0, 0), align=None)
    chamfer2_piece_4 = extrude(amount=33.337395926, mode=Mode.PRIVATE)
    chamfer2_piece_4 = split(chamfer2_piece_4, bisect_by=Plane(origin=(8e-08, -23.671290362, 0.328809638), z_dir=(0, 0.7071067811865475, -0.7071067811865476)), keep=Keep.TOP, mode=Mode.PRIVATE)
    add(chamfer2_piece_4, mode=Mode.SUBTRACT)

    # Chamfer3
    chamfer3_edges = [part.edges().sort_by_distance(p)[0] for p in [
        (0, -24, 3),
    ]]
    chamfer(chamfer3_edges, length=CHAMFER3_SIZE)

    # Fillet2
    fillet2_edges = [part.edges().sort_by_distance(p)[0] for p in [
        (22.5, 5, 1.5),
        (22.5, -5, 1.5),
        (-22.5, -5, 1.5),
        (-22.5, 5, 1.5),
    ]]
    fillet(fillet2_edges, radius=FILLET2_R - 0.0001)  # a hair under: the kernel refuses the full size

    # Fillet3
    fillet3_edges = [part.edges().sort_by_distance(p)[0] for p in [
        (15, -5, 1.5),
        (-15, -5, 1.5),
    ]]
    fillet(fillet3_edges, radius=FILLET3_R)

    # Intersect1 outline → Intersect1 (cut)
    with BuildSketch(Plane(origin=(0, 0, 0), x_dir=(1, 0, 0), z_dir=(0, 1, 0)).offset(INTERSECT1_START)):
        with BuildLine():
            Line((16.706491257, -7.936491673), (15, -4.980762114))
            Line((15, -4.980762114), (15, -23))
            ThreePointArc((15, -23), (14.911730056, -24.325747825), (14.648478541, -25.628090913))
            Line((14.648478541, -25.628090913), (16.706491257, -22.063508327))
            Line((16.706491257, -22.063508327), (18, -19.823085465))
            Line((18, -19.823085465), (18, -10.176914535))
            Line((18, -10.176914535), (16.706491257, -7.936491673))
        make_face()
        with BuildLine():
            Line((-15, -23), (-15, -4.980762114))
            Line((-15, -4.980762114), (-16.706491257, -7.936491673))
            Line((-16.706491257, -7.936491673), (-18, -10.176914535))
            Line((-18, -10.176914535), (-18, -19.823085465))
            Line((-18, -19.823085465), (-16.706491257, -22.063508327))
            Line((-16.706491257, -22.063508327), (-14.648478541, -25.628090913))
            ThreePointArc((-14.648478541, -25.628090913), (-14.911730056, -24.325747825), (-15, -23))
        make_face()
    extrude(amount=INTERSECT1_DEPTH, mode=Mode.SUBTRACT)


solid = part.part
